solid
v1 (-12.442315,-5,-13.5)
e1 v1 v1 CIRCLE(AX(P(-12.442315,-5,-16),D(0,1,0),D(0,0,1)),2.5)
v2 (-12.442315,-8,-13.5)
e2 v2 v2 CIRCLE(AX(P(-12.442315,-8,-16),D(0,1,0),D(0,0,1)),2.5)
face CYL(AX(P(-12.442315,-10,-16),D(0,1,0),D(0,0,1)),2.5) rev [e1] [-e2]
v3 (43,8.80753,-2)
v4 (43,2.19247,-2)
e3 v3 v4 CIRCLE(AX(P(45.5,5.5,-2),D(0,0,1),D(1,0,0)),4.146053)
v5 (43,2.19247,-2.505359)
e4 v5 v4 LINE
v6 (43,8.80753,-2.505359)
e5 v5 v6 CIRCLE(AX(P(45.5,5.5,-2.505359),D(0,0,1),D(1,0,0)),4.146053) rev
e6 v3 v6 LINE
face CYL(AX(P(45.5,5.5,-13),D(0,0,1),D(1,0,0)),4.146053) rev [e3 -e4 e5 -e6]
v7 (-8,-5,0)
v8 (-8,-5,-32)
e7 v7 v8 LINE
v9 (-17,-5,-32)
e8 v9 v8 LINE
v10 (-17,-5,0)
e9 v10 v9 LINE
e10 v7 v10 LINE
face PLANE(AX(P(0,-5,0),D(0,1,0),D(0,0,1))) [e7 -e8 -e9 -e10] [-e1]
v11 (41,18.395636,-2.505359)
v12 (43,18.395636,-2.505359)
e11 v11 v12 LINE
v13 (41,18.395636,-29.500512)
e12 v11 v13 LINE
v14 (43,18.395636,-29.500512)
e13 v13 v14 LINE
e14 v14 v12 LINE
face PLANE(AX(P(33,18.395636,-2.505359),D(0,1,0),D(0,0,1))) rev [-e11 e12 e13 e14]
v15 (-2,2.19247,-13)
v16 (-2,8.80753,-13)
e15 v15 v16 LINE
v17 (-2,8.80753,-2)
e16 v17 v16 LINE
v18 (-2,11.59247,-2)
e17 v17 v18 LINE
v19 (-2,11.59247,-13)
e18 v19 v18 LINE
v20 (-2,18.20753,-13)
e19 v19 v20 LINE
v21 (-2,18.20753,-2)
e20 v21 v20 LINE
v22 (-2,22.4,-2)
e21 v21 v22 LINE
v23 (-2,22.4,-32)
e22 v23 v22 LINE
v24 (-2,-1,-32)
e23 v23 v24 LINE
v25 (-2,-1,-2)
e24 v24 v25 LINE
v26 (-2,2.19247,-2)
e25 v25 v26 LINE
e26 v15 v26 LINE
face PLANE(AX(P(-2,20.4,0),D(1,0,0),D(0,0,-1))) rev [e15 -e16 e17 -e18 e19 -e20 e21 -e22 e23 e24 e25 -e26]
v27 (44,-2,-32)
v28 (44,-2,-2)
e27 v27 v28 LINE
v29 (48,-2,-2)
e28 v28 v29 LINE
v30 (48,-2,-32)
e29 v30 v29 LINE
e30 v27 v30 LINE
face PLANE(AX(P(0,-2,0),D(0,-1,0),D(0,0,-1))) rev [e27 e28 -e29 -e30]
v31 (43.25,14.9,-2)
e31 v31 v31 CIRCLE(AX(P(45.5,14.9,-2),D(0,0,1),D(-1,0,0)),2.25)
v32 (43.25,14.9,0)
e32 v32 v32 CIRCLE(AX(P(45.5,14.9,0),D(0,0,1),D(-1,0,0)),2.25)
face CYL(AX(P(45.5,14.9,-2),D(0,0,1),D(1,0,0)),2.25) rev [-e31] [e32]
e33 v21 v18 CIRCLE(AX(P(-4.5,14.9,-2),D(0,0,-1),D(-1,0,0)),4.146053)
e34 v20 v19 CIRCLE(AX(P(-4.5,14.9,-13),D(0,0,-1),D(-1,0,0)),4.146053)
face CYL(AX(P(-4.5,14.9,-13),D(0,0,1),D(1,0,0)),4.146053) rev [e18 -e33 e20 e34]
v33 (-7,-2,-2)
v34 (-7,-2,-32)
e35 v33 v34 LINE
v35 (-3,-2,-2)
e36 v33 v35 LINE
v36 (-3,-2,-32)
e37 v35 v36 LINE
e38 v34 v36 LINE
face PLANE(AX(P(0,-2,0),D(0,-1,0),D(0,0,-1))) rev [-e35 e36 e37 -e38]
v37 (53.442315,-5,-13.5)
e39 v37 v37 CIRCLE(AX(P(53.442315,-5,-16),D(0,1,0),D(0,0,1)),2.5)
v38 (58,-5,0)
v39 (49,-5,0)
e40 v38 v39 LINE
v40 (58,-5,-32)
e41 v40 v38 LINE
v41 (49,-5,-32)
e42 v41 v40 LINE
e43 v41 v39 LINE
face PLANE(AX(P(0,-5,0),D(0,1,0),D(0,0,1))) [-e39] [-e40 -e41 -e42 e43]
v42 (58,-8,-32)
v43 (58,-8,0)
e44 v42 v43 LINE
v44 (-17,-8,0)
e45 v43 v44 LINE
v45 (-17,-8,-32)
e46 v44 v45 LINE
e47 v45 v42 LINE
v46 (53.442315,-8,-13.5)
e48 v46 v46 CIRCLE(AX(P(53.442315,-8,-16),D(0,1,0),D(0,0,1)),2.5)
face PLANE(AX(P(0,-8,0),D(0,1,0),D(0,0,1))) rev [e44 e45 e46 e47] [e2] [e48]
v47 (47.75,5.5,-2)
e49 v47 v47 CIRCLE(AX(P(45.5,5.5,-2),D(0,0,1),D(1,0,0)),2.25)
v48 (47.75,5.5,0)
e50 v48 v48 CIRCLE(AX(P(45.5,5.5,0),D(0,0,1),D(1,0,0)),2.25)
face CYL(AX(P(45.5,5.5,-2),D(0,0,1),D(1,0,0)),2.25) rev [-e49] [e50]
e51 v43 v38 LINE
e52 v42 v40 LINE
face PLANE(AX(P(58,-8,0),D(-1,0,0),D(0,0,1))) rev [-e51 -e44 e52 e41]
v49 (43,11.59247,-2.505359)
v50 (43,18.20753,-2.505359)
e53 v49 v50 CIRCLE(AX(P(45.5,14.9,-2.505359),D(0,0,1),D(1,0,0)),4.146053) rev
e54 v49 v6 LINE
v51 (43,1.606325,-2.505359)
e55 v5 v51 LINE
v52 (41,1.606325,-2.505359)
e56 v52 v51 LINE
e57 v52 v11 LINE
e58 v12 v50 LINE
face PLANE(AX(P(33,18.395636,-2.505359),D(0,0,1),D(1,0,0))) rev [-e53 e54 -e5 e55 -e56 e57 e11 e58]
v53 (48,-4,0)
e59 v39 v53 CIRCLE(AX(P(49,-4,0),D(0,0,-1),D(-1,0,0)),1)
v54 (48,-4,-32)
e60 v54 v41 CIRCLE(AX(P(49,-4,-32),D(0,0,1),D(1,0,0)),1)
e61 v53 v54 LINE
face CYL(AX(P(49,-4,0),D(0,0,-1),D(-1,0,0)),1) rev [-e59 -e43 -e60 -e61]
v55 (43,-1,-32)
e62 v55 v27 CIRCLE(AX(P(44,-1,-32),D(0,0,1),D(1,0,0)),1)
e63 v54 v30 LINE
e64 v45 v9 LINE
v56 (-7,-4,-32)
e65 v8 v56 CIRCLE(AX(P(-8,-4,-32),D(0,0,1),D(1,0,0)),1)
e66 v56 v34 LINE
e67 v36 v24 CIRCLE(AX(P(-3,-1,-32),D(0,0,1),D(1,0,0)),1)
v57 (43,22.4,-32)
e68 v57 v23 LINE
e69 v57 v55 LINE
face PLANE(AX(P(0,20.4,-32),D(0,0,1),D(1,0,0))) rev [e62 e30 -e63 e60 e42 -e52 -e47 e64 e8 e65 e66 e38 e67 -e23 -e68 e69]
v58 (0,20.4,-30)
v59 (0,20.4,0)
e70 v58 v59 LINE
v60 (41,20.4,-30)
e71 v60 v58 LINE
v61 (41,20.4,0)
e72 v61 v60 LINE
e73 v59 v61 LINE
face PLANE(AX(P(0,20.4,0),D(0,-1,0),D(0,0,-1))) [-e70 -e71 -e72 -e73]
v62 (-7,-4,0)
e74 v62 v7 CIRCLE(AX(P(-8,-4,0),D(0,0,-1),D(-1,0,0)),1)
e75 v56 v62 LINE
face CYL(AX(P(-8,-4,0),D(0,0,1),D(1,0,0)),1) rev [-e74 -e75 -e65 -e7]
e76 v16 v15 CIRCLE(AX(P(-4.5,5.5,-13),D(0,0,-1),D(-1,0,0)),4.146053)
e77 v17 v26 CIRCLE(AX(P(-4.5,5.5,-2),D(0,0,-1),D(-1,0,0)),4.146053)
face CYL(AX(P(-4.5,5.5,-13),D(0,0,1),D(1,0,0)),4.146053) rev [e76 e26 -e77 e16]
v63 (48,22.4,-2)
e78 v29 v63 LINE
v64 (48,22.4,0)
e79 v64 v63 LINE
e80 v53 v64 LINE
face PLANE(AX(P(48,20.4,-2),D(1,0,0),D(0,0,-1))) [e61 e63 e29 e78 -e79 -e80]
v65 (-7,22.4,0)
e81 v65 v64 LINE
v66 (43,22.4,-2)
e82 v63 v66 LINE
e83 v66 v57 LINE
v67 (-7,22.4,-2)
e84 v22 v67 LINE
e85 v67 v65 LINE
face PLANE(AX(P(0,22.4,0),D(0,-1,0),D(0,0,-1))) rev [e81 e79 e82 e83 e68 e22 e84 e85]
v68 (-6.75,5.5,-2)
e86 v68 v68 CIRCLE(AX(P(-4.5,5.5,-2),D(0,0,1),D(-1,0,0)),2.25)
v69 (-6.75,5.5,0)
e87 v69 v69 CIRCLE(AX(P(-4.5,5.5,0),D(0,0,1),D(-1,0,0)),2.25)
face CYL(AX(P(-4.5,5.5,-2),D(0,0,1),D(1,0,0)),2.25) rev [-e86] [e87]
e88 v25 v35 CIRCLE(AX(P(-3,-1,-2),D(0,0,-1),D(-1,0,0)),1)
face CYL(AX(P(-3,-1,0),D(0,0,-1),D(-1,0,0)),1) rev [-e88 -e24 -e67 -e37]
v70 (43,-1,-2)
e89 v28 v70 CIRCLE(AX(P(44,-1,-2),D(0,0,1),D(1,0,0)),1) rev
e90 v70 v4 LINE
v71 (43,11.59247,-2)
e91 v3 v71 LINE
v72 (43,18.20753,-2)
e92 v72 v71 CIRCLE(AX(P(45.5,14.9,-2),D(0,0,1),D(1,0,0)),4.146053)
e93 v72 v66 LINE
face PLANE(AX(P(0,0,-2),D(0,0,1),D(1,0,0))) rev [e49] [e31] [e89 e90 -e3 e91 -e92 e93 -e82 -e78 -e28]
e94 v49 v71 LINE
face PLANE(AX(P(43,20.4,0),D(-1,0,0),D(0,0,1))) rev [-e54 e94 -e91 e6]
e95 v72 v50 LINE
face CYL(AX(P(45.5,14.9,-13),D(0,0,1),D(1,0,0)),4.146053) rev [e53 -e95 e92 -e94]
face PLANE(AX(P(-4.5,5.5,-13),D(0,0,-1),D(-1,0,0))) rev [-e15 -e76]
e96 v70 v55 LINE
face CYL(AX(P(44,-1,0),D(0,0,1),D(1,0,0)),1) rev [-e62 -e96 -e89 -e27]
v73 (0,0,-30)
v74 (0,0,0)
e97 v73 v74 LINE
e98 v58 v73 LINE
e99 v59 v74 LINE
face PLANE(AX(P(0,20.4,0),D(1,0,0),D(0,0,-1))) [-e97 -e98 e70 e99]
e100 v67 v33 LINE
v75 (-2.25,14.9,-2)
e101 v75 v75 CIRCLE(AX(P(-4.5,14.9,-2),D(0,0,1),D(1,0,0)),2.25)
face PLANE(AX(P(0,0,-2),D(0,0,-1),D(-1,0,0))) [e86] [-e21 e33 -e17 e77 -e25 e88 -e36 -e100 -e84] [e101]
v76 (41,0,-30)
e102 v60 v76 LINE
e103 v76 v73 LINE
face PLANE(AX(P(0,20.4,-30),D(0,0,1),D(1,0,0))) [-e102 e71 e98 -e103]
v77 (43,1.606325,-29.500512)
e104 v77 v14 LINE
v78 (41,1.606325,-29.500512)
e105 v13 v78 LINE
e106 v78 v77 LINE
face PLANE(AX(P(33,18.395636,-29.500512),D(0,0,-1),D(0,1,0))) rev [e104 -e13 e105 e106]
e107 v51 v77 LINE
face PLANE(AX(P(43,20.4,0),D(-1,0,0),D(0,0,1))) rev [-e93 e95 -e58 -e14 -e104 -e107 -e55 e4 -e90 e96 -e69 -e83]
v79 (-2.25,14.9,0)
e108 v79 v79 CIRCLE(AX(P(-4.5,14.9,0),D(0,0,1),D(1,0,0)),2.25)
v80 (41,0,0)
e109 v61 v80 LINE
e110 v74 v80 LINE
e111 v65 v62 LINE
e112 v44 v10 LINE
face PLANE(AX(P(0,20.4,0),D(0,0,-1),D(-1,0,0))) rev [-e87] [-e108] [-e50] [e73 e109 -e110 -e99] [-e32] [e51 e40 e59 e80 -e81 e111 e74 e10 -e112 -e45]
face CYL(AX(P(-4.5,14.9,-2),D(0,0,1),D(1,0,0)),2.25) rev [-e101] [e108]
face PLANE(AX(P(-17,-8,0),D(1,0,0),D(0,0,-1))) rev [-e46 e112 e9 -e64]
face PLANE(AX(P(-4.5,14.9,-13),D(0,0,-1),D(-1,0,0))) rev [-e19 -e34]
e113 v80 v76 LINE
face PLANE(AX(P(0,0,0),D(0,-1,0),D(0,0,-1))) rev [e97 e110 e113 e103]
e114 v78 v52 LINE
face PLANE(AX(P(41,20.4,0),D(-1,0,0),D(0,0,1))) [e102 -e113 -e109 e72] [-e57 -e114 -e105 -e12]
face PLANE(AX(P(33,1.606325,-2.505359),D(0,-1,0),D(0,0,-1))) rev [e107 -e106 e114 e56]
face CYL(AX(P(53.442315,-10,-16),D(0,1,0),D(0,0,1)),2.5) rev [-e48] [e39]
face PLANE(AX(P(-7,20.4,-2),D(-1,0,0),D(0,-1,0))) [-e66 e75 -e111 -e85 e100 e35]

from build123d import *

# Parameters (mm, degrees)
SKETCH1_W               = 41
SKETCH1_H               = 30
BOSS_EXTRUDE1_DEPTH     = 20.4
SHELL1_T                = 2
BOSS_EXTRUDE2_START     = -2
BOSS_EXTRUDE2_OUTLINE_W = 5
BOSS_EXTRUDE2_OUTLINE_H = 20.4
BOSS_EXTRUDE2_OUTLINE_R = 2.25
BOSS_EXTRUDE2_DEPTH     = 2
SKETCH3_W               = 5
SKETCH3_H               = 2
BOSS_EXTRUDE3_DEPTH     = 2
SKETCH4_W               = 5
SKETCH4_H               = 2
BOSS_EXTRUDE4_DEPTH     = 2
SKETCH5_W               = 5
SKETCH5_H               = 2
BOSS_EXTRUDE5_DEPTH     = 2
SKETCH6_W               = 5
SKETCH6_H               = 2
BOSS_EXTRUDE6_DEPTH     = 2
SKETCH7_W               = 5
SKETCH7_H               = 30
BOSS_EXTRUDE7_DEPTH     = 1
SKETCH9_R               = 4.146052681
CUT_EXTRUDE4_DEPTH      = 11
SKETCH10_W              = 55
SKETCH10_H              = 32
BOSS_EXTRUDE9_DEPTH     = 2
BOSS_EXTRUDE10_DEPTH    = 3
FILLET1_R               = 1
SKETCH18_W              = 26.995153054
SKETCH18_H              = 16.789310936
CUT_EXTRUDE5_DEPTH      = 10
SKETCH20_R              = 2.5
CUT_EXTRUDE7_DEPTH      = 10


# Read off the part's stored shape, not the designer's step: Boss-Extrude2
with BuildPart() as part:
    # Sketch1 → Boss-Extrude1 (new body)
    with BuildSketch(Plane(origin=(0, 0, 0), x_dir=(1, 0, 0), z_dir=(0, 1, 0))):
        with Locations((20.5, 15)):
            Rectangle(SKETCH1_W, SKETCH1_H)
    extrude(amount=BOSS_EXTRUDE1_DEPTH)

    # Shell1
    shell1_openings = [part.faces().sort_by_distance(p)[0] for p in [
        (20.5, 10.2, 0),
    ]]
    offset(amount=SHELL1_T, openings=shell1_openings, kind=Kind.INTERSECTION)

    # Boss-Extrude2 outline → Boss-Extrude2 (add)
    # profile 1 of 2: a face of its own
    with BuildSketch(Plane.XY.offset(BOSS_EXTRUDE2_START)):
        with Locations((-4.5, 10.2)):
            Rectangle(BOSS_EXTRUDE2_OUTLINE_W, BOSS_EXTRUDE2_OUTLINE_H)
        with Locations((-4.5, 5.5)):
            Circle(BOSS_EXTRUDE2_OUTLINE_R, mode=Mode.SUBTRACT)
        with Locations((-4.5, 14.9)):
            Circle(BOSS_EXTRUDE2_OUTLINE_R, mode=Mode.SUBTRACT)
    # profile 2 of 2: a face of its own
    with BuildSketch(Plane.XY.offset(BOSS_EXTRUDE2_START)):
        with Locations((45.5, 10.2)):
            Rectangle(BOSS_EXTRUDE2_OUTLINE_W, BOSS_EXTRUDE2_OUTLINE_H)
        with Locations((45.5, 5.5)):
            Circle(BOSS_EXTRUDE2_OUTLINE_R, mode=Mode.SUBTRACT)
        with Locations((45.5, 14.9)):
            Circle(BOSS_EXTRUDE2_OUTLINE_R, mode=Mode.SUBTRACT)
    extrude(amount=BOSS_EXTRUDE2_DEPTH)

    # Sketch3 → Boss-Extrude3 (add)
    with BuildSketch(Plane(origin=(0, 20.4, 0), x_dir=(1, 0, 0), z_dir=(0, 1, 0))):
        with Locations((-4.5, 1)):
            Rectangle(SKETCH3_W, SKETCH3_H)
    extrude(amount=BOSS_EXTRUDE3_DEPTH)

    # Sketch4 → Boss-Extrude4 (add)
    with BuildSketch(Plane.XZ):
        with Locations((-4.5, -1)):
            Rectangle(SKETCH4_W, SKETCH4_H)
    extrude(amount=BOSS_EXTRUDE4_DEPTH)

    # Sketch5 → Boss-Extrude5 (add)
    with BuildSketch(Plane(origin=(0, 20.4, 0), x_dir=(1, 0, 0), z_dir=(0, 1, 0))):
        with Locations((45.5, 1)):
            Rectangle(SKETCH5_W, SKETCH5_H)
    extrude(amount=BOSS_EXTRUDE5_DEPTH)

    # Sketch6 → Boss-Extrude6 (add)
    with BuildSketch(Plane.XZ):
        with Locations((45.5, -1)):
            Rectangle(SKETCH6_W, SKETCH6_H)
    extrude(amount=BOSS_EXTRUDE6_DEPTH)

    # Sketch7 → Boss-Extrude7 (add)
    with BuildSketch(Plane.XZ.offset(2)):
        Polygon((-7, -2), (-2, -2), (-2, -32), (43, -32), (43, -2), (48, -2), (48, 0), (-7, 0), align=None)
        with Locations((-4.5, -17)):
            Rectangle(SKETCH7_W, SKETCH7_H)
        with Locations((45.5, -17)):
            Rectangle(SKETCH7_W, SKETCH7_H)
    extrude(amount=BOSS_EXTRUDE7_DEPTH)

    # Sketch9 → Cut-Extrude4 (cut)
    with BuildSketch(Plane(origin=(0, 0, -2), x_dir=(-1, 0, 0), z_dir=(0, 0, -1))):
        with Locations((4.5, 5.5)):
            Circle(SKETCH9_R)
        with Locations((4.5, 14.9)):
            Circle(SKETCH9_R)
    cut_extrude4 = extrude(amount=CUT_EXTRUDE4_DEPTH, mode=Mode.SUBTRACT)

    # Mirror1: Cut-Extrude4 across plane
    add(cut_extrude4.mirror(Plane(origin=(20.5, 0, 0), x_dir=(0, 0, 1), z_dir=(1, 0, 0))), mode=Mode.SUBTRACT)

    # Sketch10 → Boss-Extrude9 (add)
    with BuildSketch(Plane.XZ.offset(3)):
        with Locations((20.5, -16)):
            Rectangle(SKETCH10_W, SKETCH10_H)
    extrude(amount=BOSS_EXTRUDE9_DEPTH)

    # Sketch11 → Boss-Extrude10 (add)
    with BuildSketch(Plane.XZ.offset(5)):
        Polygon((48, 0), (-7, 0), (-17, 0), (-17, -32), (-7, -32), (48, -32), (58, -32), (58, 0), align=None)
    extrude(amount=BOSS_EXTRUDE10_DEPTH)

    # Fillet1
    fillet1_edges = [part.edges().sort_by_distance(p)[0] for p in [
        (43, -2, -17),
        (-7, -5, -16),
        (48, -5, -16),
        (-2, -2, -17),
    ]]
    fillet(fillet1_edges, radius=FILLET1_R)

    # Sketch18 → Cut-Extrude5 (cut)
    with BuildSketch(Plane(origin=(43, 0, 0), x_dir=(0, 0, -1), z_dir=(1, 0, 0))):
        with Locations((16.002935908, 10.000980191)):
            Rectangle(SKETCH18_W, SKETCH18_H)
    extrude(amount=-CUT_EXTRUDE5_DEPTH, mode=Mode.SUBTRACT)

    # Sketch20 → Cut-Extrude7 (cut)
    with BuildSketch(Plane(origin=(0, 0, 0), x_dir=(1, 0, 0), z_dir=(0, 1, 0))):
        with Locations(Location((-12.442315246, 16, 0), (0, 0, 270))):
            Circle(SKETCH20_R)
        with Locations(Location((53.442315246, 16, 0), (0, 0, 270))):
            Circle(SKETCH20_R)
    extrude(amount=-CUT_EXTRUDE7_DEPTH, mode=Mode.SUBTRACT)


solid = part.part
